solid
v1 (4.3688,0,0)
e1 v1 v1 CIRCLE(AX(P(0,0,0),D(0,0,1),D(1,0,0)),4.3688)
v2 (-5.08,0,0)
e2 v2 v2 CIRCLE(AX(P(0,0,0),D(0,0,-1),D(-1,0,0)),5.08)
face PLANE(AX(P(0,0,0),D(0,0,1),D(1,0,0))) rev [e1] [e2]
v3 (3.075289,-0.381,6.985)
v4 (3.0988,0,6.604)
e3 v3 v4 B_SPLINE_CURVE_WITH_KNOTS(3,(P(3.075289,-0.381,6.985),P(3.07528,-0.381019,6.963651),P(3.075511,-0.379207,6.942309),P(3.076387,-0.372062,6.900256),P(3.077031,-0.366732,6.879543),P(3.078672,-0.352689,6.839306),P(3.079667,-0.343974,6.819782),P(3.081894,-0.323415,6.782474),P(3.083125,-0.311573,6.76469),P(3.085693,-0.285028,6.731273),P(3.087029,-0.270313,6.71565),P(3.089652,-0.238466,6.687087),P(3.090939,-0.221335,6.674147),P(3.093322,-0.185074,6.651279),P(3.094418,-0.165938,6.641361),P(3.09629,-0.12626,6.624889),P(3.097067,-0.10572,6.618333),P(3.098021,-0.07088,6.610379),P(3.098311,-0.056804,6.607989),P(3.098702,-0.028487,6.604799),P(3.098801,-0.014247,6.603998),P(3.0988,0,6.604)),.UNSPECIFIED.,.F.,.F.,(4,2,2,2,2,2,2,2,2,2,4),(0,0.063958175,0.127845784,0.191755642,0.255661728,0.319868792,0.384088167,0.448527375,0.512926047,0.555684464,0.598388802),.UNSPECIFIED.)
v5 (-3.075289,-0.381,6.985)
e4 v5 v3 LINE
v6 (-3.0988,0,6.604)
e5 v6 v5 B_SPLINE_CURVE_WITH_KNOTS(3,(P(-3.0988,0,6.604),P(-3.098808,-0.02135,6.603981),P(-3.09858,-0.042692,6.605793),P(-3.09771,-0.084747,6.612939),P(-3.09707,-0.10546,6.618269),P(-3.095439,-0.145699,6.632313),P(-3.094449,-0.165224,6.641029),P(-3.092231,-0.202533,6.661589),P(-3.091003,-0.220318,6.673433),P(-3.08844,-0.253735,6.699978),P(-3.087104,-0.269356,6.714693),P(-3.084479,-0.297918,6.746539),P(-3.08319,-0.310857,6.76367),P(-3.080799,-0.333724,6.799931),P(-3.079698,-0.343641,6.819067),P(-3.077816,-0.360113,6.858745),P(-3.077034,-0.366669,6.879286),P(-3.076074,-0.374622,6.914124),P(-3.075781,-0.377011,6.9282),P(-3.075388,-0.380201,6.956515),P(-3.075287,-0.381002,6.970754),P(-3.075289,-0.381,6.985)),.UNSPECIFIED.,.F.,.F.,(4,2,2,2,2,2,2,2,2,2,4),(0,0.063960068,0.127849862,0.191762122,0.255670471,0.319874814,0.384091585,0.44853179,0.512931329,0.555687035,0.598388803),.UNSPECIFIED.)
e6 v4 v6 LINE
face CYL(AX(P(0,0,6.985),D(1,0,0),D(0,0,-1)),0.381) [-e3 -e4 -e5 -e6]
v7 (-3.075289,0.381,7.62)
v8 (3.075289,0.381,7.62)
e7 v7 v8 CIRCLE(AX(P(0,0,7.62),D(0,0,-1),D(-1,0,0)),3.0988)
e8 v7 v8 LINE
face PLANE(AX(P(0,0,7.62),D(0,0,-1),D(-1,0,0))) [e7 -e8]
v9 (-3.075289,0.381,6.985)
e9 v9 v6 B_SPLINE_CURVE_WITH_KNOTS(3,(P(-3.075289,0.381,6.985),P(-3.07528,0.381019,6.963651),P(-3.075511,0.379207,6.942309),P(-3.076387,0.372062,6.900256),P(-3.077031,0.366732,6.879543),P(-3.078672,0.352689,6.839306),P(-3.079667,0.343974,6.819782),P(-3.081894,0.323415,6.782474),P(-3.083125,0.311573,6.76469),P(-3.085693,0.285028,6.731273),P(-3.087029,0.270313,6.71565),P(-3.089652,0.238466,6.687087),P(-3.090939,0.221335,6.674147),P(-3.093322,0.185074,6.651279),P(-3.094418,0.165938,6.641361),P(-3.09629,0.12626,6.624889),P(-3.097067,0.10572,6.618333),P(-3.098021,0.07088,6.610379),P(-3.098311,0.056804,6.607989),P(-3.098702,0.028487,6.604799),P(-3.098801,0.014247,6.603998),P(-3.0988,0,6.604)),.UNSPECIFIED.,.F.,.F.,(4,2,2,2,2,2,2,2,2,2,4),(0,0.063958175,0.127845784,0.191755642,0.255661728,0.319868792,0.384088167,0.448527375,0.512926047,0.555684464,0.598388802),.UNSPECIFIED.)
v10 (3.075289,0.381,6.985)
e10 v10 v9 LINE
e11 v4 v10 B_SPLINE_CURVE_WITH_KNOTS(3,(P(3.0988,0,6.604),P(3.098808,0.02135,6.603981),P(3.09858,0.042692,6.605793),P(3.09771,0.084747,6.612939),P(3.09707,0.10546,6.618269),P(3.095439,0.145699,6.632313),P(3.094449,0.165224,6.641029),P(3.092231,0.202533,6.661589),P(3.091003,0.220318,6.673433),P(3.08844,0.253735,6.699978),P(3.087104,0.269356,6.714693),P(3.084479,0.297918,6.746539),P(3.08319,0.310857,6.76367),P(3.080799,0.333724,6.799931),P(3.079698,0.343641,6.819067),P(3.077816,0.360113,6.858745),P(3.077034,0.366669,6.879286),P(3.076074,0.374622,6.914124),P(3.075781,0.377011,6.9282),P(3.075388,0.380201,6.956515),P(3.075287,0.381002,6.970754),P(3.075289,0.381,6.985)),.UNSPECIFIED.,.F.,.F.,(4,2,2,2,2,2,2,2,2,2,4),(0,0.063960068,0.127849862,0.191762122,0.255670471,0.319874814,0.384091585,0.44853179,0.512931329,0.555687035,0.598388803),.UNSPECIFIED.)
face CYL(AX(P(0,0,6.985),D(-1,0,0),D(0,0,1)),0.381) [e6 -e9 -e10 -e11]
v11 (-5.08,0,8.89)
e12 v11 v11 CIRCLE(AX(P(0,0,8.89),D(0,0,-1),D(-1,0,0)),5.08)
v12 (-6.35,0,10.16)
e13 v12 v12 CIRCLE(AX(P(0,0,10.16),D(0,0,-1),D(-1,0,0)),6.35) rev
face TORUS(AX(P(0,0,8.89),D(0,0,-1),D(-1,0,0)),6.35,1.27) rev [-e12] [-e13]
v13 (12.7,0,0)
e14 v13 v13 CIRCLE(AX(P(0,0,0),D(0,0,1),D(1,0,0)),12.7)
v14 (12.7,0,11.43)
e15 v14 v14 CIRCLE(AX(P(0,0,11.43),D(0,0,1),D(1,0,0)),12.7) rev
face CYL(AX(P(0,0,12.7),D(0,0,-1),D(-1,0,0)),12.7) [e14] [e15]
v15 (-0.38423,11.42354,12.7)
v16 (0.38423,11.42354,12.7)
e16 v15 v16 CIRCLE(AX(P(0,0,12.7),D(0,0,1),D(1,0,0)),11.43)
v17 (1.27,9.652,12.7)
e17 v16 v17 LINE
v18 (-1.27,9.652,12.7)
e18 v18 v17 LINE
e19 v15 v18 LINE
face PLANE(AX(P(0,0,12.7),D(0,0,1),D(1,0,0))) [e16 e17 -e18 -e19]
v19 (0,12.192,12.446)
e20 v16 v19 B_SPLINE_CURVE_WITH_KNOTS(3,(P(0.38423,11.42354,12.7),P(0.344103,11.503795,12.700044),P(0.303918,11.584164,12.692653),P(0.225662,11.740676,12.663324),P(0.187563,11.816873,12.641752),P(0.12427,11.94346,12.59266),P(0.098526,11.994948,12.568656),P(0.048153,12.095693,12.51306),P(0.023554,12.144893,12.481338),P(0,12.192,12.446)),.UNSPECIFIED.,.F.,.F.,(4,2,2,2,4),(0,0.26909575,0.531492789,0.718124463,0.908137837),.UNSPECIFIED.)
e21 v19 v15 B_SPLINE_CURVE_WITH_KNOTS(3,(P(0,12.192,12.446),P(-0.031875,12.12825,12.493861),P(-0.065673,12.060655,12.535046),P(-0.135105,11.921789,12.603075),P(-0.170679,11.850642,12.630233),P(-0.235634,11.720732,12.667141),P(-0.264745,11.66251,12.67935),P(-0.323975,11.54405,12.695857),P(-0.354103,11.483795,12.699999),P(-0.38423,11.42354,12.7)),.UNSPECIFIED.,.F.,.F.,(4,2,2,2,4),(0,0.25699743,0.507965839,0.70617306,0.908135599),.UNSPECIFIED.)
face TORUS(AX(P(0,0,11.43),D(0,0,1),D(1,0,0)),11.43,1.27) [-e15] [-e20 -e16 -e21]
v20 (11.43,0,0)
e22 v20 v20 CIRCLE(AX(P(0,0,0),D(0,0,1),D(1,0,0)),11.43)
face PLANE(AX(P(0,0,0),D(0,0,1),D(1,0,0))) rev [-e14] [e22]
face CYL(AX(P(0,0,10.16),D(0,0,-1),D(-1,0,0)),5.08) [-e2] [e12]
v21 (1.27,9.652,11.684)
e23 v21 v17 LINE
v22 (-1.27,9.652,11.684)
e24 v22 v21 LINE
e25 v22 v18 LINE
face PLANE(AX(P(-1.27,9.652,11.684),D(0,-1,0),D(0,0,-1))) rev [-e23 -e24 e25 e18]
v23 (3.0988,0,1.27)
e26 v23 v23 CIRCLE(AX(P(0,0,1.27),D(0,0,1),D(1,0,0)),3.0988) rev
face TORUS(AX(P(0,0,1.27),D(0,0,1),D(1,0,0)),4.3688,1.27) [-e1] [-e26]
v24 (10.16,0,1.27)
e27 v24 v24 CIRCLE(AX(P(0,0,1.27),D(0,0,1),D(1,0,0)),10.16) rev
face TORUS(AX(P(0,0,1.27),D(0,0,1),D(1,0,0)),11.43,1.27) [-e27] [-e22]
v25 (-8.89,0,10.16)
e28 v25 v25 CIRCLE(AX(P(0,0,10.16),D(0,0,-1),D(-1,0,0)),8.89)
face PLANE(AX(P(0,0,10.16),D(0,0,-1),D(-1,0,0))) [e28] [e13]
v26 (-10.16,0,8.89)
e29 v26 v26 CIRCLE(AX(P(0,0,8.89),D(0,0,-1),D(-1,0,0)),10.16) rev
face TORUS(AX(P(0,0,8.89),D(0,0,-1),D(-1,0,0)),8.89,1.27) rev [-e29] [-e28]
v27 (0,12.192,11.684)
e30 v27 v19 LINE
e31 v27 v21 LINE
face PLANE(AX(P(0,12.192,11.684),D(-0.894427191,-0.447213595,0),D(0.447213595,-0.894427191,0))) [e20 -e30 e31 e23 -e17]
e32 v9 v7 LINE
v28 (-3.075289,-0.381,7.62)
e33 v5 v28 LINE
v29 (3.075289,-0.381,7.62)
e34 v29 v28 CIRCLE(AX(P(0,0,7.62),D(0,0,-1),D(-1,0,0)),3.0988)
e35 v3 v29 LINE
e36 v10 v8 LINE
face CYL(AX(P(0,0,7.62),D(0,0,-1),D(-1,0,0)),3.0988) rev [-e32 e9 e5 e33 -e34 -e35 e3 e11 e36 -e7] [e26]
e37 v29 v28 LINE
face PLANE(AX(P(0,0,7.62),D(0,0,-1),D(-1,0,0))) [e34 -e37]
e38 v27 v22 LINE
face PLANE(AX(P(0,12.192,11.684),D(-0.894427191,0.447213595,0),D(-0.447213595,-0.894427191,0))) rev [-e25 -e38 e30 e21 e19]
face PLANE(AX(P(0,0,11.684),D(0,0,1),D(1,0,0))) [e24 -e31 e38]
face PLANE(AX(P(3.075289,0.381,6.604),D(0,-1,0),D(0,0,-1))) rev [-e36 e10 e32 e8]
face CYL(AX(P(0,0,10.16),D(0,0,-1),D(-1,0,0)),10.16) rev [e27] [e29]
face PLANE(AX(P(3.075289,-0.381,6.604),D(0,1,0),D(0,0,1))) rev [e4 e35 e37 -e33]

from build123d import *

# Parameters (mm, degrees)
SKETCH1_R           = 12.7
BOSS_EXTRUDE1_DEPTH = 12.7
SKETCH2_R           = 3.0988
CUT_EXTRUDE1_DEPTH  = 7.62
BOSS_EXTRUDE3_START = 1.016
BOSS_EXTRUDE3_DEPTH = 1.016
SKETCH4_R           = 10.16
SKETCH4_R_2         = 5.08
CUT_EXTRUDE2_DEPTH  = 10.16
CUT_EXTRUDE3_DEPTH  = 1.016
FILLET1_R           = 1.27
FILLET2_R           = 0.381


# Some blends are built 0.0001 mm under size
with BuildPart() as part:
    # Sketch1 → Boss-Extrude1 (new body)
    with BuildSketch(Plane.XY):
        Circle(SKETCH1_R)
    extrude(amount=BOSS_EXTRUDE1_DEPTH)

    # Sketch2 → Cut-Extrude1 (cut)
    with BuildSketch(Plane(origin=(0, 0, 0), x_dir=(-1, 0, 0), z_dir=(0, 0, -1))):
        Circle(SKETCH2_R)
    extrude(amount=-CUT_EXTRUDE1_DEPTH, mode=Mode.SUBTRACT)

    # Sketch3 → Boss-Extrude3 (add)
    with BuildSketch(Plane(origin=(0, 0, 7.62), x_dir=(-1, 0, 0), z_dir=(0, 0, -1)).offset(BOSS_EXTRUDE3_START)):
        with BuildLine():
            Line((-3.075288676, 0.381), (3.075288676, 0.381))
            ThreePointArc((3.075288676, 0.381), (3.0988, 0), (3.075288676, -0.381))
            Line((3.075288676, -0.381), (-3.075288676, -0.381))
            ThreePointArc((-3.075288676, -0.381), (-3.0988, 0), (-3.075288676, 0.381))
        make_face()
    extrude(amount=-BOSS_EXTRUDE3_DEPTH)

    # Sketch4 → Cut-Extrude2 (cut)
    with BuildSketch(Plane(origin=(0, 0, 0), x_dir=(-1, 0, 0), z_dir=(0, 0, -1))):
        Circle(SKETCH4_R)
        Circle(SKETCH4_R_2, mode=Mode.SUBTRACT)
    extrude(amount=-CUT_EXTRUDE2_DEPTH, mode=Mode.SUBTRACT)

    # Sketch5 → Cut-Extrude3 (cut)
    with BuildSketch(Plane.XY.offset(12.7)):
        Polygon((0, 12.192), (-1.27, 9.652), (1.27, 9.652), align=None)
    extrude(amount=-CUT_EXTRUDE3_DEPTH, mode=Mode.SUBTRACT)

    # Fillet1
    # the kernel refuses this fillet: 1.27 mm, written as the material it adds along each edge
    with BuildSketch(Plane(origin=(0, 0, 10.16), x_dir=(-1, 0, 0), z_dir=(0, -1, 0))) as fillet1_piece_1:
        with BuildLine():
            CenterArc((10.16 - FILLET1_R, FILLET1_R), FILLET1_R, 270, 90)
            Line((10.16 - FILLET1_R, 0), (10.16, 0))
            Line((10.16, 0), (10.16, FILLET1_R))
        make_face()
    revolve(axis=Axis((0, 0, 10.16), (0, 0, -1)))
    with BuildSketch(Plane(origin=(0, 0, 10.16), x_dir=(-1, 0, 0), z_dir=(0, -1, 0))) as fillet1_piece_2:
        with BuildLine():
            CenterArc((5.08 + FILLET1_R, FILLET1_R), FILLET1_R, 180, 90)
            Line((5.08, FILLET1_R), (5.08, 0))
            Line((5.08, 0), (5.08 + FILLET1_R, 0))
        make_face()
    revolve(axis=Axis((0, 0, 10.16), (0, 0, -1)))
    # the kernel refuses this fillet: 1.27 mm, written as the material it takes off along each edge
    with BuildSketch(Plane(origin=(0, 0, 0), x_dir=(-1, 0, 0), z_dir=(0, -1, 0))) as fillet1_2_piece_1:
        with BuildLine():
            CenterArc((10.16 + FILLET1_R, -FILLET1_R), FILLET1_R, 90, 90)
            Line((10.16, -FILLET1_R), (10.16, 0))
            Line((10.16, 0), (10.16 + FILLET1_R, 0))
        make_face()
    revolve(axis=Axis((0, 0, 0), (0, 0, -1)), mode=Mode.SUBTRACT)
    with BuildSketch(Plane(origin=(0, 0, 12.7), x_dir=(1, 0, 0), z_dir=(0, -1, 0))) as fillet1_2_piece_2:
        with BuildLine():
            CenterArc((12.7 - FILLET1_R, -FILLET1_R), FILLET1_R, 0, 90)
            Line((12.7 - FILLET1_R, 0), (12.7, 0))
            Line((12.7, 0), (12.7, -FILLET1_R))
        make_face()
    revolve(axis=Axis((0, 0, 12.7), (0, 0, 1)), mode=Mode.SUBTRACT)
    with BuildSketch(Plane(origin=(0, 0, 0), x_dir=(-1, 0, 0), z_dir=(0, -1, 0))) as fillet1_2_piece_3:
        with BuildLine():
            CenterArc((3.0988 + FILLET1_R, -FILLET1_R), FILLET1_R, 90, 90)
            Line((3.0988, -FILLET1_R), (3.0988, 0))
            Line((3.0988, 0), (3.0988 + FILLET1_R, 0))
        make_face()
    revolve(axis=Axis((0, 0, 0), (0, 0, -1)), mode=Mode.SUBTRACT)

    # Fillet2
    fillet2_edges = [part.edges().sort_by_distance(p)[0] for p in [
        (0, 0.381, 6.604),
        (0, -0.381, 6.604),
    ]]
    fillet(fillet2_edges, radius=FILLET2_R - 0.0001)  # a hair under: the kernel refuses the full size


solid = part.part
